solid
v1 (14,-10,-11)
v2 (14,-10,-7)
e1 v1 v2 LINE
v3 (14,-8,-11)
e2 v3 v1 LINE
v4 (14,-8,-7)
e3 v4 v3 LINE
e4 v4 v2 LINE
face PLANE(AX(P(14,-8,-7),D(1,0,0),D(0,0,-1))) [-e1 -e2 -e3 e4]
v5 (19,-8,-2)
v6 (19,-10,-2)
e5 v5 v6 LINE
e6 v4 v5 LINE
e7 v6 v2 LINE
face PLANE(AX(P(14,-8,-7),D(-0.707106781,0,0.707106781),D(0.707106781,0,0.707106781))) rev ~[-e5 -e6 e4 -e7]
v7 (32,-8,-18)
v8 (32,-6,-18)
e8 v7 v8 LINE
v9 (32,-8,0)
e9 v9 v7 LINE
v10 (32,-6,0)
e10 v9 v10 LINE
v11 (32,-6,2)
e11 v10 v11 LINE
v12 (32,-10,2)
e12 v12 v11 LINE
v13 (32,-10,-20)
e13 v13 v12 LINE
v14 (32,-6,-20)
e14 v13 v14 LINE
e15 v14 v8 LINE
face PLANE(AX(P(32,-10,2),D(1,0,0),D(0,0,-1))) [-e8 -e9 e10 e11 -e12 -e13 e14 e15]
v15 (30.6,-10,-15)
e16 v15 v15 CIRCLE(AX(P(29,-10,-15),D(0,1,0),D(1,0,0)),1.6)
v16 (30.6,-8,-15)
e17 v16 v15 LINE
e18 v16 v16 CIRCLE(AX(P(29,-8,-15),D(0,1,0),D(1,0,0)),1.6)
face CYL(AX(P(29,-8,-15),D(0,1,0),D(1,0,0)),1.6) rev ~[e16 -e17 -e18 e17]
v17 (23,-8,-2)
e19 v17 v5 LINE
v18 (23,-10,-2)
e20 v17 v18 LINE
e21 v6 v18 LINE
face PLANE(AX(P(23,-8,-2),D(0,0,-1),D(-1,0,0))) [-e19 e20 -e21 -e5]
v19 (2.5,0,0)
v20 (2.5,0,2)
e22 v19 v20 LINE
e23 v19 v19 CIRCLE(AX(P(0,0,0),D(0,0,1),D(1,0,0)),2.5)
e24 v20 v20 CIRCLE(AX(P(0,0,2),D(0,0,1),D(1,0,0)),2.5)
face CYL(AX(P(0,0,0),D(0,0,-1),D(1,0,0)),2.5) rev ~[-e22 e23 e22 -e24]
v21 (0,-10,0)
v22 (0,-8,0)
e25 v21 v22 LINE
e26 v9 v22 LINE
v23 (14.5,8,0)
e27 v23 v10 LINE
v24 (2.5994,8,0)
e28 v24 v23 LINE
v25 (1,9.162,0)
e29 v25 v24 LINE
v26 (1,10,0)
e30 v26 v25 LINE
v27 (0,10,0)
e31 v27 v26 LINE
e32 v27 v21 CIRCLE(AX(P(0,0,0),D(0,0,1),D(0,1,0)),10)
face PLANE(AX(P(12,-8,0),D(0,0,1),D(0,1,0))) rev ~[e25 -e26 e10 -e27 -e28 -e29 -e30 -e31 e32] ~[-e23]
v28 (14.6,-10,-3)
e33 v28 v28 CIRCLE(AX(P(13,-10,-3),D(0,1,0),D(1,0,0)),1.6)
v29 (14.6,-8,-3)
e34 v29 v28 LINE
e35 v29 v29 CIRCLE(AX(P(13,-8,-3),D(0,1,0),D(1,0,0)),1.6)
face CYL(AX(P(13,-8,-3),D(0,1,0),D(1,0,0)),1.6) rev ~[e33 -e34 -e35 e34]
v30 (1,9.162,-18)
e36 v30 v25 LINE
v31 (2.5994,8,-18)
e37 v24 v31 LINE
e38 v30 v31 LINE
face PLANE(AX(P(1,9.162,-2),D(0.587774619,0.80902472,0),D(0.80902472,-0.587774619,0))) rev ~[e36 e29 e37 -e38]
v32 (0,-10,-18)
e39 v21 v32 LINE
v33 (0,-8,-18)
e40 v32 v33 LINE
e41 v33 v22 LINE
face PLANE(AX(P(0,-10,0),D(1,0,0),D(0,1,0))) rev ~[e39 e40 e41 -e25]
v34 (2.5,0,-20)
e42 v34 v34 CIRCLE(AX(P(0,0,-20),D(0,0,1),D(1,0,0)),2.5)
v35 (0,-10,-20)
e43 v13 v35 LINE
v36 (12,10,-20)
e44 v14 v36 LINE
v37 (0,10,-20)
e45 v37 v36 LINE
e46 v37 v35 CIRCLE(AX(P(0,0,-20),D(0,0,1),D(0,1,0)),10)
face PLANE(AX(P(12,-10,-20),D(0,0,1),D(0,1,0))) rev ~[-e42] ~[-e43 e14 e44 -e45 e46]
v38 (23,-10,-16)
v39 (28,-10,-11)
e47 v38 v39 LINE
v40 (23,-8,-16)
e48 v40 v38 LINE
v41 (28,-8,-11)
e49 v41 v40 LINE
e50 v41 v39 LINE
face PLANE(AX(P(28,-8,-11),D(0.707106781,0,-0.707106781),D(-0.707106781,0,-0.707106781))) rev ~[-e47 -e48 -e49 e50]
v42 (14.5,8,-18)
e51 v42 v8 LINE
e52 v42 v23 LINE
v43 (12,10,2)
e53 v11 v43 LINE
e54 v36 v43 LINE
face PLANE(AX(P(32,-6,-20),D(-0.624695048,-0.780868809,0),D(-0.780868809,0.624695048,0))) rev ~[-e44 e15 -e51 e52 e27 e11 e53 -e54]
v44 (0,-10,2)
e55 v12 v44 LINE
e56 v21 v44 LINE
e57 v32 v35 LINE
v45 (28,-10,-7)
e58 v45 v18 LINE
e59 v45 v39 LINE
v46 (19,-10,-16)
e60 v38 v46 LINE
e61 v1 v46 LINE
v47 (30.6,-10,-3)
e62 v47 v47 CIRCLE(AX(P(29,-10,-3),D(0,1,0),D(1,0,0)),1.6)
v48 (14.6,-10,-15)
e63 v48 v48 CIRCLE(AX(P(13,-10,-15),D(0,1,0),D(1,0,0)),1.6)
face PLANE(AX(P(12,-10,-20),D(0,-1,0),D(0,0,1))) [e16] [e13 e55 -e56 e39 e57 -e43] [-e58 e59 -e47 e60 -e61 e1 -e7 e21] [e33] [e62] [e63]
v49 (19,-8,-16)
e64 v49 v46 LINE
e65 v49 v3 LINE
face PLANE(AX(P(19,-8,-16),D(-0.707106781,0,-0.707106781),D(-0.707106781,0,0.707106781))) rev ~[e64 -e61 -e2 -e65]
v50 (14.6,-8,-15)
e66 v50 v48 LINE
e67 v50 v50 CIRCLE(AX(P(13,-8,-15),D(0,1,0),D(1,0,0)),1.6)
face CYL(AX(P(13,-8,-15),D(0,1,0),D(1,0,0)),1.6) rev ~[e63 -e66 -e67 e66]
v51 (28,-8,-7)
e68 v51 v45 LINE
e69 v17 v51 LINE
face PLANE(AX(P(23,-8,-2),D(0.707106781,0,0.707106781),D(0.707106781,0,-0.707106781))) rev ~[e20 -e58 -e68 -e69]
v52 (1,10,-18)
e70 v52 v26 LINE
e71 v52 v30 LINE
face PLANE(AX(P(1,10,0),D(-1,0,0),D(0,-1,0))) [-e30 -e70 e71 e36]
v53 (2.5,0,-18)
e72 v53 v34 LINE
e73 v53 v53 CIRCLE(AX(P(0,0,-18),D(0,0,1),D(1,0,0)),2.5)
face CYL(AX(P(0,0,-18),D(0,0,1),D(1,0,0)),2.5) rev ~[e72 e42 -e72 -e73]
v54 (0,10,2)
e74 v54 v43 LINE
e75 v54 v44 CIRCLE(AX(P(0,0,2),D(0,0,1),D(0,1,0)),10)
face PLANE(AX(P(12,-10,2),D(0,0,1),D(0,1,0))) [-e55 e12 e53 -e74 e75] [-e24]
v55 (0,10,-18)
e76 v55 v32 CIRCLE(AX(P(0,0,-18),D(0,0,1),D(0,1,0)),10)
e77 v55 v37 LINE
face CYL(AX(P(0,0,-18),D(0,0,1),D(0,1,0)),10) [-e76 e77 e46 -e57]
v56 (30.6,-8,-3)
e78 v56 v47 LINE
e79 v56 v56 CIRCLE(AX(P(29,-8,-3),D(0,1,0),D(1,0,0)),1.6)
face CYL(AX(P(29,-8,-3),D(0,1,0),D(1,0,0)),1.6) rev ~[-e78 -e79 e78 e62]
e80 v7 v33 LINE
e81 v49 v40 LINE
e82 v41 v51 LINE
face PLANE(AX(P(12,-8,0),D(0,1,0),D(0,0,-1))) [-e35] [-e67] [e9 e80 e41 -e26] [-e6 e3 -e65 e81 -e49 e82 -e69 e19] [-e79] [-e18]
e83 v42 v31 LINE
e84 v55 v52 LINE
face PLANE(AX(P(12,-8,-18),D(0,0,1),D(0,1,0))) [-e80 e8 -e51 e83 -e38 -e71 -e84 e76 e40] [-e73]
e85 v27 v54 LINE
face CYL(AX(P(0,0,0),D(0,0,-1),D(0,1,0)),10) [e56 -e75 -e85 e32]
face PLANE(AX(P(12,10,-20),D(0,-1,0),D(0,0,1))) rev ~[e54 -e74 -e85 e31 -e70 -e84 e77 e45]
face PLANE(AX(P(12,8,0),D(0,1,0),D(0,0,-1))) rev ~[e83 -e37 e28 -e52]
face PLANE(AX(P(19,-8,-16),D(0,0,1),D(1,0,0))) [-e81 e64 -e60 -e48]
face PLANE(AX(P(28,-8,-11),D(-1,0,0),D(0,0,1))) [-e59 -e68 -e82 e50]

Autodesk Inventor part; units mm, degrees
ref_plane "YZ Plane" through (0, 0, 0) normal (1, 0, 0) x (0, 1, 0)
ref_plane "XZ Plane" through (0, 0, 0) normal (0, 1, 0) x (-1, 0, 0)
sketch "Sketch1" plane through (0, 0, 0) normal (0, 0, 1) x (1, 0, 0)
  circle A0 centre (0, 0) radius 2.5
  arc A1 (0, 10) -> (0, -10) centre (0, 0) ccw
  line L0 (0, 10) -> (12, 10)
  line L1 (0, -10) -> (12, -10)
  line L2 (12, -10) -> (12, 10)
  dimension "d0" = 5
  dimension "d1" = 20
  dimension "d2" = 12
extrude "Extrusion1" add sketch "Sketch1" along normal blind 2
sketch "Sketch5" plane through (0, 0, 0) normal (0, 0, -1) x (-1, 0, 0)
  circle A0 centre (0, 0) radius 2.5 projected
  line L0 (-12, -10) -> (0, -10)
  line L1 (0, -10) -> (0, -8)
  line L2 (0, -8) -> (-12, -8)
  line L3 (-12, -8) -> (-12, -10)
  line L4 (-12, 10) -> (-1, 10)
  line L5 (-1, 10) -> (-1, 8)
  line L6 (-1, 8) -> (-12, 8)
  line L7 (-12, 8) -> (-12, 10)
  dimension "d21" = 2
  dimension "d22" = 2
  dimension "d24" = 1
extrude "Extrusion5" add sketch "Sketch5" along normal blind 2 contours L3 L2 L1 L0 | L4 L5 L6 L7
sketch "Sketch6" plane through (0, 0, -2) normal (0, 0, -1) x (-1, 0, 0)
  line L0 (-12, 8) -> (-1, 8) projected
  line L1 (-1, 8) -> (-1, 10) projected
  line L2 (-1, 9.162) -> (-2.5994, 8)
  line L3 (-2.5994, 8) -> (6.8052, -4.9443) construction
  line L4 (6.8052, -4.9443) -> (8.4046, -3.7823) construction
  line L5 (8.4046, -3.7823) -> (-1, 9.162) construction
  line L6 (-2.5994, 8) -> (-1, 8)
  line L7 (-1, 9.162) -> (-1, 8)
  point P0 (0, 0)
  dimension "d27" = 16
  dimension "d28" = 8
  dimension "d29" = 36
extrude "Extrusion6" cut sketch "Sketch6" against normal blind 2
ref_plane "Work Plane1" through (0, 0, -9) normal (0, 0, -1) x (-1, 0, 0)
mirror "Mirror1" about plane through (0, 0, -9) normal (0, 0, -1)
sketch "Sketch7" plane through (0, -10, -16) normal (0, 0, 1) x (1, 0, 0)
  line L0 (12, 0) -> (0, 0) projected
  line L1 (12, 2) -> (12, 0) projected
  line L2 (0, 2) -> (12, 2) projected
  line L3 (0, 0) -> (0, 2) projected
  line L4 (2.5994, 18) -> (1, 19.162) projected
  line L5 (12, 18) -> (2.5994, 18) projected
  line L6 (12, 20) -> (12, 18) projected
  line L7 (1, 20) -> (12, 20) projected
  line L8 (1, 19.162) -> (1, 20) projected
  point P0 (0, 10)
extrude "Extrusion7" add sketch "Sketch7" along normal blind 14
sketch "Sketch8" plane through (12, -10, 2) normal (1, 0, 0) x (0, 0, -1)
  line L0 (22, 20) -> (0, 20) projected
  line L1 (0, 0) -> (0, 20) projected
  line L2 (22, 0) -> (0, 0) projected
  line L3 (22, 0) -> (22, 20) projected
  line L4 (2, 18) -> (20, 18) projected
  line L5 (20, 2) -> (20, 18) projected
  line L6 (2, 2) -> (20, 2) projected
  line L7 (2, 2) -> (2, 18) projected
  point P0 (2, 10)
extrude "Extrusion8" add sketch "Sketch8" along normal blind 20
sketch "Sketch9" plane through (0, 0, -20) normal (0, 0, -1) x (-1, 0, 0)
  line L0 (-32, 10) -> (0, 10) projected
  line L1 (-32, -10) -> (-32, 10) projected
  line L2 (-32, -6) -> (-12, 10)
  dimension "d37" = 20
  dimension "d38" = 4
extrude "Extrusion9" cut sketch "Sketch9" against normal blind 22
sketch "Sketch10" plane through (0, -8, 0) normal (0, 1, 0) x (1, 0, 0)
  line L0 (32, 0) -> (0, 0) projected
  line L1 (32, 18) -> (32, 0) projected
  line L2 (0, 18) -> (32, 18) projected
  line L3 (13, 15) -> (29, 15) construction
  line L4 (29, 15) -> (29, 3) construction
  line L5 (29, 3) -> (13, 3) construction
  line L6 (13, 3) -> (13, 15) construction
  circle A0 centre (13, 15) radius 1.6
  circle A1 centre (29, 15) radius 1.6
  circle A2 centre (29, 3) radius 1.6
  circle A3 centre (13, 3) radius 1.6
  line L7 (19, 16) -> (23, 16)
  line L8 (28, 11) -> (28, 7)
  line L9 (23, 2) -> (19, 2)
  line L10 (14, 7) -> (14, 11)
  line L11 (14, 7) -> (19, 2)
  line L12 (23, 2) -> (28, 7)
  line L13 (28, 11) -> (23, 16)
  line L14 (19, 16) -> (14, 11)
  point P0 (14, 9)
  point P1 (13, 9)
  dimension "d41" = 3.2
  dimension "d42" = 3
  dimension "d43" = 3
  dimension "d44" = 3
  dimension "d45" = 16
  dimension "d46" = 45
  dimension "d47" = 4
  dimension "d48" = 1
  dimension "d49" = 1
extrude "Extrusion10" cut sketch "Sketch10" against normal through all
properties part number "z_axis_cable_mount_a" material "ABS Plastic"
